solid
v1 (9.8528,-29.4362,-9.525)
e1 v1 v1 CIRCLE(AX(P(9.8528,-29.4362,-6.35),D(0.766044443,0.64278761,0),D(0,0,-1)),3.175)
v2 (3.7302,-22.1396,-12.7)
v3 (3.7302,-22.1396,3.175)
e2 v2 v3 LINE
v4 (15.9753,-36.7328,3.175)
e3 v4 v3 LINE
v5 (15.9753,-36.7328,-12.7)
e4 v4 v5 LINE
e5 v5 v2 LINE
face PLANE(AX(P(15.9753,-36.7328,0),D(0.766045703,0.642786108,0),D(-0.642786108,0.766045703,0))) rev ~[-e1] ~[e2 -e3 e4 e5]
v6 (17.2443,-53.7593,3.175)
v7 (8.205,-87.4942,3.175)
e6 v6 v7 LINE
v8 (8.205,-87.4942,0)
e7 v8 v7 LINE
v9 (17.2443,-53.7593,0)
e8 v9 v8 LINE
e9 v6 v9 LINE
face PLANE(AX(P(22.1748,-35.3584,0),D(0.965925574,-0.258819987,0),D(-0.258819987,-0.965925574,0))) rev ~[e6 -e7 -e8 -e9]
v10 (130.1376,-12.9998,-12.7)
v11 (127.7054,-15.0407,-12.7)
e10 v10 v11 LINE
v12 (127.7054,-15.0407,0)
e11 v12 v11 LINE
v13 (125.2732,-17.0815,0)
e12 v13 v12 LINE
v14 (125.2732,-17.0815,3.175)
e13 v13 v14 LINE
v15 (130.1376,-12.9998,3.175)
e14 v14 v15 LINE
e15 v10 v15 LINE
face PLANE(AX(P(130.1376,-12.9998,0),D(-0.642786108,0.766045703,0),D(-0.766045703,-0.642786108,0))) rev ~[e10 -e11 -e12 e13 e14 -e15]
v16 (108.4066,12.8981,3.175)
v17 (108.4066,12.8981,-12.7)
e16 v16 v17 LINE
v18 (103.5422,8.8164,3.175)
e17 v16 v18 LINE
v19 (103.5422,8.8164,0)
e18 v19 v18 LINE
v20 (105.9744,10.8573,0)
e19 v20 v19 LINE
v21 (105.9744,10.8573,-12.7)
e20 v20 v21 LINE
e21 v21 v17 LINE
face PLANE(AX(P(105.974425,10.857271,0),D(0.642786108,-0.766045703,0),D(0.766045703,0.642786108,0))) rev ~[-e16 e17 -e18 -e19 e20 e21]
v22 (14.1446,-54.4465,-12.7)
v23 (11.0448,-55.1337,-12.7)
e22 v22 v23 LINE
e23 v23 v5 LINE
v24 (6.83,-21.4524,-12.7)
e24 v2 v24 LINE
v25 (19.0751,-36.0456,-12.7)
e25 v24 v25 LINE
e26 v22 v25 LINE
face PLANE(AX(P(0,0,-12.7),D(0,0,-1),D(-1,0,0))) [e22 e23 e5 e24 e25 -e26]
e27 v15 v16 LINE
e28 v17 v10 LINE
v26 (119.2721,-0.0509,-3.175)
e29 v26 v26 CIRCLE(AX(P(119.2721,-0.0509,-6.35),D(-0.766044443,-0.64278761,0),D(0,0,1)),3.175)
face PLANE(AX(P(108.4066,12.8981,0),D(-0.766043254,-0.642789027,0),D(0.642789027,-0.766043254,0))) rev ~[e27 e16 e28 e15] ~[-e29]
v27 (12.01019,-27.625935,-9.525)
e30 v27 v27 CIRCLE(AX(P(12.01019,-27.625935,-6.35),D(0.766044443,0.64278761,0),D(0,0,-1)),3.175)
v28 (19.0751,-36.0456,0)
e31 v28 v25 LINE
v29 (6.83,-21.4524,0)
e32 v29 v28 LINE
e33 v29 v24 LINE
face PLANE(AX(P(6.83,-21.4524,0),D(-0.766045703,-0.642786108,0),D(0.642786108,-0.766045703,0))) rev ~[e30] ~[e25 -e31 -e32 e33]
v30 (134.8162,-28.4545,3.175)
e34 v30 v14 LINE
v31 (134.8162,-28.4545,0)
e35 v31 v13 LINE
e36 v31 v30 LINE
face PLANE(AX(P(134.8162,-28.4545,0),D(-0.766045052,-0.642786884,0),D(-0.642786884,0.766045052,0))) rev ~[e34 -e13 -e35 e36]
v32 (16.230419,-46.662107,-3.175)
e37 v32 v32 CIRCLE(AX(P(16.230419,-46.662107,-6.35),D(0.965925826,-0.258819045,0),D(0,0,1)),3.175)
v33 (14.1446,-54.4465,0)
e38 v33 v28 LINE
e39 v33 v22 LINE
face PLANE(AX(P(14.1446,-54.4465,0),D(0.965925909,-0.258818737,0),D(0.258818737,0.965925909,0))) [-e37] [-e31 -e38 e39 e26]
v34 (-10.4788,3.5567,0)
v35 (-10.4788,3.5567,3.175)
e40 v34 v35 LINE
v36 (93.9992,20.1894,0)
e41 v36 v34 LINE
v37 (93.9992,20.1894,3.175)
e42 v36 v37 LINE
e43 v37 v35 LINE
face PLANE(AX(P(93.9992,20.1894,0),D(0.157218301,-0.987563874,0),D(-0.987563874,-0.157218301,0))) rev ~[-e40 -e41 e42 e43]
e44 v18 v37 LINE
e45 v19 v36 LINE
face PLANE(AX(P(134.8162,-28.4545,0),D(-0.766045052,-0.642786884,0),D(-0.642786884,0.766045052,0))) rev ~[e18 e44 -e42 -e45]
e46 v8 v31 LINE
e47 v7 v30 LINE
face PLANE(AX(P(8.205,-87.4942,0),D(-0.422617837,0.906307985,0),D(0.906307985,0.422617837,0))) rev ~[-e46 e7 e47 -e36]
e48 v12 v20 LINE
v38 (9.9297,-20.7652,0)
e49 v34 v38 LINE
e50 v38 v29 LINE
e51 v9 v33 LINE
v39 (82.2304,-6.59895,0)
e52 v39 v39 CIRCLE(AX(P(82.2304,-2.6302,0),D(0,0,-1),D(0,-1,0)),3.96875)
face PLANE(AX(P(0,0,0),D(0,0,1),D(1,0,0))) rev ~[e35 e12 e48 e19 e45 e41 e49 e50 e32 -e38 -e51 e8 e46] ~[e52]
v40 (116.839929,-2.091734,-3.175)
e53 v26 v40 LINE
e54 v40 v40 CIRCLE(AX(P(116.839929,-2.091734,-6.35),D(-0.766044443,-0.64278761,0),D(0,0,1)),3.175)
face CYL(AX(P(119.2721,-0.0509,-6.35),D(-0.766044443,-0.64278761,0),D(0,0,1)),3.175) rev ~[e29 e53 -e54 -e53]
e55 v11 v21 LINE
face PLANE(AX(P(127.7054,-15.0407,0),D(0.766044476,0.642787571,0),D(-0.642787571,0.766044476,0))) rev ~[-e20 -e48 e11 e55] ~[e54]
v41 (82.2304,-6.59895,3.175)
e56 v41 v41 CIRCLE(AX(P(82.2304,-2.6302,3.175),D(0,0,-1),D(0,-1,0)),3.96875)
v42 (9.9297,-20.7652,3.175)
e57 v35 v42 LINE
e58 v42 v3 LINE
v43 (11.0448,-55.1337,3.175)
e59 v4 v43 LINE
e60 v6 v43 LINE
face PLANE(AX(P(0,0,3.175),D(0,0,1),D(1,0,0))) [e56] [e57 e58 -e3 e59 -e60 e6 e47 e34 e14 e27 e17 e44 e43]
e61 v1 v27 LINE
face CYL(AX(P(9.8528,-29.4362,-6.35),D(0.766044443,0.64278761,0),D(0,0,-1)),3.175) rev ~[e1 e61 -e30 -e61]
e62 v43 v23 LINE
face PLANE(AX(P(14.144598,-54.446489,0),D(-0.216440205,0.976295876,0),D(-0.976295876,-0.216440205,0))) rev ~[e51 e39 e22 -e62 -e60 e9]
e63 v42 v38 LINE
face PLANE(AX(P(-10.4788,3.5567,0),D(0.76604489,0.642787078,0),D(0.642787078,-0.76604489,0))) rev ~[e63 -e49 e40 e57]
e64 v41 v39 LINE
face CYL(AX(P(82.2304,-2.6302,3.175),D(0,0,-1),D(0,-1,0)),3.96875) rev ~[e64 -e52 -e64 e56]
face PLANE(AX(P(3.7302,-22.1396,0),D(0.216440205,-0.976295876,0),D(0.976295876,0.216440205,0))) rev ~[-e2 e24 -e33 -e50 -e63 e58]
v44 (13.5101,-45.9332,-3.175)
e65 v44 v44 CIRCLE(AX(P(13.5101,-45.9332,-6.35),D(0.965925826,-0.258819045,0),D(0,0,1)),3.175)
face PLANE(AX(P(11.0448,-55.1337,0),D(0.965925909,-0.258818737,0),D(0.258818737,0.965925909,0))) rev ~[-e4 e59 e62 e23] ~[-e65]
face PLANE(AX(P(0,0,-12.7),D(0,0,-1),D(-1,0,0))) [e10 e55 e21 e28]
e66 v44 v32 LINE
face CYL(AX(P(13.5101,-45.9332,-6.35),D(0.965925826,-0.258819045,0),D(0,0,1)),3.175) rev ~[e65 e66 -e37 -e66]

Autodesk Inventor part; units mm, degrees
ref_plane "YZ Plane" through (0, 0, 0) normal (1, 0, 0) x (0, 1, 0)
ref_plane "XZ Plane" through (0, 0, 0) normal (0, 1, 0) x (-1, 0, 0)
ref_plane "XY Plane" through (0, 0, 0) normal (0, 0, 1) x (1, 0, 0)
sketch "Sketch1" plane through (0, 0, 0) normal (0, 0, 1) x (1, 0, 0)
  line L0 (-10.4788, 3.5567) -> (22.1748, -35.3584)
  line L1 (-10.4788, 3.5567) -> (40.3212, 3.5567) construction
  line L2 (22.1748, -35.3584) -> (8.205, -87.4942)
  line L3 (8.205, -87.4942) -> (134.8162, -28.4545)
  line L4 (134.8162, -28.4545) -> (93.9992, 20.1894)
  line L5 (93.9992, 20.1894) -> (-10.4788, 3.5567)
  point P0 (0, 0)
  dimension "d0" = 50.8
  dimension "d1" = 50
  dimension "d2" = 53.975
  dimension "d3" = 125
  dimension "d4" = 139.7
  dimension "d5" = 50
  dimension "d6" = 63.5
  dimension "d7" = 75
extrude "Extrusion1" add sketch "Sketch1" along normal blind 3.175
sketch "Sketch2" plane through (0, 0, 3.175) normal (0, 0, 1) x (1, 0, 0)
  line L0 (-10.4788, 3.5567) -> (22.1748, -35.3584) projected
  line L1 (22.1748, -35.3584) -> (8.205, -87.4942) projected
  line L2 (22.1748, -35.3584) -> (9.9297, -20.7652)
  line L3 (22.1748, -35.3584) -> (17.2443, -53.7593)
  line L4 (9.9297, -20.7652) -> (3.7302, -22.1396)
  line L5 (17.2443, -53.7593) -> (11.0448, -55.1337)
  line L6 (15.9753, -36.7328) -> (3.7302, -22.1396)
  line L7 (15.9753, -36.7328) -> (11.0448, -55.1337)
  point P0 (0, 0)
  dimension "d10" = 19.05
  dimension "d11" = 19.05
  dimension "d12" = 6.35
  dimension "d13" = 6.35
  dimension "d14" = 6.35
extrude "Extrusion2" add sketch "Sketch2" against normal blind 3.175
sketch "Sketch3" plane through (0, 0, 0) normal (0, 0, -1) x (-1, 0, 0)
  line L0 (-17.2443, -53.7593) -> (-11.0448, -55.1337) projected
  line L1 (-11.0448, -55.1337) -> (-15.9753, -36.7328) projected
  line L2 (-15.9753, -36.7328) -> (-3.7302, -22.1396) projected
  line L3 (-3.7302, -22.1396) -> (-9.9297, -20.7652) projected
  line L4 (-3.7302, -22.1396) -> (-6.83, -21.4524)
  line L5 (-11.0448, -55.1337) -> (-14.1446, -54.4465)
  line L6 (-14.1446, -54.4465) -> (-19.0751, -36.0456)
  line L7 (-6.83, -21.4524) -> (-19.0751, -36.0456)
  point P0 (0, 0)
  dimension "d17" = 3.175
  dimension "d18" = 3.175
extrude "Extrusion3" add sketch "Sketch3" along normal blind 12.7
sketch "Sketch4" plane through (3.7302, -22.1396, -12.7) normal (-0.7660444, -0.6427876, 0) x (0, 0, 1)
  line L0 (0, -19.05) -> (0, 0) projected
  line L1 (15.875, -19.05) -> (0, -19.05) projected
  line L2 (0, -9.525) -> (6.35, -9.525)
  point P0 (12.7, 19.3577)
  dimension "d21" = 6.35
hole "Hole1" at (9.8528, -29.4362, -6.35) direction (0.7660444, 0.6427876, 0) diameter 6.35 end through all
sketch "Sketch5" plane through (15.9753, -36.7328, -12.7) normal (-0.9659258, 0.258819, 0) x (0, 0, 1)
  line L0 (0, -19.05) -> (0, 0) projected
  line L1 (15.875, -19.05) -> (0, -19.05) projected
  line L2 (0, -9.525) -> (6.35, -9.525)
  point P0 (12.7, 31.3464)
  dimension "d29" = 6.35
hole "Hole2" at (13.5101, -45.9332, -6.35) direction (0.9659258, -0.258819, 0) diameter 6.35 end through all
sketch "Sketch6" plane through (0, 0, 0) normal (0, 0, -1) x (-1, 0, 0)
  line L0 (-134.8162, -28.4545) -> (-93.9992, 20.1894) projected
  line L1 (-114.4077, -4.1326) -> (-103.5422, 8.8164)
  line L2 (-114.4077, -4.1326) -> (-125.2732, -17.0815)
  line L3 (-125.2732, -17.0815) -> (-130.1376, -12.9998)
  line L4 (-130.1376, -12.9998) -> (-108.4066, 12.8981)
  line L5 (-108.4066, 12.8981) -> (-103.5422, 8.8164)
  point P0 (0, 0)
  dimension "d37" = 16.9037
  dimension "d38" = 16.9037
  dimension "d39" = 6.35
  dimension "d40" = 33.8074
extrude "Extrusion4" add sketch "Sketch6" against normal blind 3.175
sketch "Sketch7" plane through (0, 0, 0) normal (0, 0, -1) x (-1, 0, 0)
  line L0 (-103.5422, 8.8164) -> (-108.4066, 12.8981) projected
  line L1 (-108.4066, 12.8981) -> (-130.1376, -12.9998) projected
  line L2 (-130.1376, -12.9998) -> (-125.2732, -17.0815) projected
  line L3 (-108.4066, 12.8981) -> (-130.1376, -12.9998)
  line L4 (-130.1376, -12.9998) -> (-127.7054, -15.0407)
  line L5 (-127.7054, -15.0407) -> (-105.9744, 10.8573)
  line L6 (-105.9744, 10.8573) -> (-108.4066, 12.8981)
  point P0 (0, 0)
  dimension "d43" = 3.175
extrude "Extrusion5" add sketch "Sketch7" along normal blind 12.7
sketch "Sketch8" plane through (108.4066, 12.8981, 3.175) normal (0.7660444, 0.6427876, 0) x (0, 0, -1)
  line L0 (15.875, 0) -> (15.875, -33.8074) projected
  line L1 (15.875, -16.9037) -> (9.525, -16.9037)
  point P0 (3.175, 59.8019)
  dimension "d46" = 6.35
hole "Hole3" at (119.2721, -0.0509, -6.35) direction (-0.7660444, -0.6427876, 0) diameter 6.35 end through all
sketch "Sketch9" plane through (0, 0, 3.175) normal (0, 0, 1) x (1, 0, 0)
  line L0 (130.1376, -12.9998) -> (108.4066, 12.8981) projected
  line L1 (103.5422, 8.8164) -> (93.9992, 20.1894) projected
  line L2 (93.9992, 20.1894) -> (-10.4788, 3.5567) projected
  line L3 (71.6563, 16.6324) -> (76.7318, -15.2495)
  line L4 (111.0345, 9.7664) -> (80.0581, -16.2259)
  line L5 (80.0581, -16.2259) -> (74.7441, -9.893)
  line L6 (76.7318, -15.2495) -> (78.9434, -14.8974)
  line L7 (17.2443, -53.7593) -> (8.205, -87.4942) projected
  line L8 (11.0448, -55.1337) -> (34.2557, 31.4904)
  line L9 (78.9434, -14.8974) -> (25.6522, -0.6181)
  line L10 (78.9434, -14.8974) -> (82.2304, -2.6302)
  point P0 (0, 0)
  dimension "d54" = 32.2834
  dimension "d55" = 40.4368
  dimension "d71" = 12.7
hole "Hole6" at (82.2304, -2.6302, 3.175) direction (0, 0, -1) diameter 7.9375 end through all
properties part number "Right Bicep"
